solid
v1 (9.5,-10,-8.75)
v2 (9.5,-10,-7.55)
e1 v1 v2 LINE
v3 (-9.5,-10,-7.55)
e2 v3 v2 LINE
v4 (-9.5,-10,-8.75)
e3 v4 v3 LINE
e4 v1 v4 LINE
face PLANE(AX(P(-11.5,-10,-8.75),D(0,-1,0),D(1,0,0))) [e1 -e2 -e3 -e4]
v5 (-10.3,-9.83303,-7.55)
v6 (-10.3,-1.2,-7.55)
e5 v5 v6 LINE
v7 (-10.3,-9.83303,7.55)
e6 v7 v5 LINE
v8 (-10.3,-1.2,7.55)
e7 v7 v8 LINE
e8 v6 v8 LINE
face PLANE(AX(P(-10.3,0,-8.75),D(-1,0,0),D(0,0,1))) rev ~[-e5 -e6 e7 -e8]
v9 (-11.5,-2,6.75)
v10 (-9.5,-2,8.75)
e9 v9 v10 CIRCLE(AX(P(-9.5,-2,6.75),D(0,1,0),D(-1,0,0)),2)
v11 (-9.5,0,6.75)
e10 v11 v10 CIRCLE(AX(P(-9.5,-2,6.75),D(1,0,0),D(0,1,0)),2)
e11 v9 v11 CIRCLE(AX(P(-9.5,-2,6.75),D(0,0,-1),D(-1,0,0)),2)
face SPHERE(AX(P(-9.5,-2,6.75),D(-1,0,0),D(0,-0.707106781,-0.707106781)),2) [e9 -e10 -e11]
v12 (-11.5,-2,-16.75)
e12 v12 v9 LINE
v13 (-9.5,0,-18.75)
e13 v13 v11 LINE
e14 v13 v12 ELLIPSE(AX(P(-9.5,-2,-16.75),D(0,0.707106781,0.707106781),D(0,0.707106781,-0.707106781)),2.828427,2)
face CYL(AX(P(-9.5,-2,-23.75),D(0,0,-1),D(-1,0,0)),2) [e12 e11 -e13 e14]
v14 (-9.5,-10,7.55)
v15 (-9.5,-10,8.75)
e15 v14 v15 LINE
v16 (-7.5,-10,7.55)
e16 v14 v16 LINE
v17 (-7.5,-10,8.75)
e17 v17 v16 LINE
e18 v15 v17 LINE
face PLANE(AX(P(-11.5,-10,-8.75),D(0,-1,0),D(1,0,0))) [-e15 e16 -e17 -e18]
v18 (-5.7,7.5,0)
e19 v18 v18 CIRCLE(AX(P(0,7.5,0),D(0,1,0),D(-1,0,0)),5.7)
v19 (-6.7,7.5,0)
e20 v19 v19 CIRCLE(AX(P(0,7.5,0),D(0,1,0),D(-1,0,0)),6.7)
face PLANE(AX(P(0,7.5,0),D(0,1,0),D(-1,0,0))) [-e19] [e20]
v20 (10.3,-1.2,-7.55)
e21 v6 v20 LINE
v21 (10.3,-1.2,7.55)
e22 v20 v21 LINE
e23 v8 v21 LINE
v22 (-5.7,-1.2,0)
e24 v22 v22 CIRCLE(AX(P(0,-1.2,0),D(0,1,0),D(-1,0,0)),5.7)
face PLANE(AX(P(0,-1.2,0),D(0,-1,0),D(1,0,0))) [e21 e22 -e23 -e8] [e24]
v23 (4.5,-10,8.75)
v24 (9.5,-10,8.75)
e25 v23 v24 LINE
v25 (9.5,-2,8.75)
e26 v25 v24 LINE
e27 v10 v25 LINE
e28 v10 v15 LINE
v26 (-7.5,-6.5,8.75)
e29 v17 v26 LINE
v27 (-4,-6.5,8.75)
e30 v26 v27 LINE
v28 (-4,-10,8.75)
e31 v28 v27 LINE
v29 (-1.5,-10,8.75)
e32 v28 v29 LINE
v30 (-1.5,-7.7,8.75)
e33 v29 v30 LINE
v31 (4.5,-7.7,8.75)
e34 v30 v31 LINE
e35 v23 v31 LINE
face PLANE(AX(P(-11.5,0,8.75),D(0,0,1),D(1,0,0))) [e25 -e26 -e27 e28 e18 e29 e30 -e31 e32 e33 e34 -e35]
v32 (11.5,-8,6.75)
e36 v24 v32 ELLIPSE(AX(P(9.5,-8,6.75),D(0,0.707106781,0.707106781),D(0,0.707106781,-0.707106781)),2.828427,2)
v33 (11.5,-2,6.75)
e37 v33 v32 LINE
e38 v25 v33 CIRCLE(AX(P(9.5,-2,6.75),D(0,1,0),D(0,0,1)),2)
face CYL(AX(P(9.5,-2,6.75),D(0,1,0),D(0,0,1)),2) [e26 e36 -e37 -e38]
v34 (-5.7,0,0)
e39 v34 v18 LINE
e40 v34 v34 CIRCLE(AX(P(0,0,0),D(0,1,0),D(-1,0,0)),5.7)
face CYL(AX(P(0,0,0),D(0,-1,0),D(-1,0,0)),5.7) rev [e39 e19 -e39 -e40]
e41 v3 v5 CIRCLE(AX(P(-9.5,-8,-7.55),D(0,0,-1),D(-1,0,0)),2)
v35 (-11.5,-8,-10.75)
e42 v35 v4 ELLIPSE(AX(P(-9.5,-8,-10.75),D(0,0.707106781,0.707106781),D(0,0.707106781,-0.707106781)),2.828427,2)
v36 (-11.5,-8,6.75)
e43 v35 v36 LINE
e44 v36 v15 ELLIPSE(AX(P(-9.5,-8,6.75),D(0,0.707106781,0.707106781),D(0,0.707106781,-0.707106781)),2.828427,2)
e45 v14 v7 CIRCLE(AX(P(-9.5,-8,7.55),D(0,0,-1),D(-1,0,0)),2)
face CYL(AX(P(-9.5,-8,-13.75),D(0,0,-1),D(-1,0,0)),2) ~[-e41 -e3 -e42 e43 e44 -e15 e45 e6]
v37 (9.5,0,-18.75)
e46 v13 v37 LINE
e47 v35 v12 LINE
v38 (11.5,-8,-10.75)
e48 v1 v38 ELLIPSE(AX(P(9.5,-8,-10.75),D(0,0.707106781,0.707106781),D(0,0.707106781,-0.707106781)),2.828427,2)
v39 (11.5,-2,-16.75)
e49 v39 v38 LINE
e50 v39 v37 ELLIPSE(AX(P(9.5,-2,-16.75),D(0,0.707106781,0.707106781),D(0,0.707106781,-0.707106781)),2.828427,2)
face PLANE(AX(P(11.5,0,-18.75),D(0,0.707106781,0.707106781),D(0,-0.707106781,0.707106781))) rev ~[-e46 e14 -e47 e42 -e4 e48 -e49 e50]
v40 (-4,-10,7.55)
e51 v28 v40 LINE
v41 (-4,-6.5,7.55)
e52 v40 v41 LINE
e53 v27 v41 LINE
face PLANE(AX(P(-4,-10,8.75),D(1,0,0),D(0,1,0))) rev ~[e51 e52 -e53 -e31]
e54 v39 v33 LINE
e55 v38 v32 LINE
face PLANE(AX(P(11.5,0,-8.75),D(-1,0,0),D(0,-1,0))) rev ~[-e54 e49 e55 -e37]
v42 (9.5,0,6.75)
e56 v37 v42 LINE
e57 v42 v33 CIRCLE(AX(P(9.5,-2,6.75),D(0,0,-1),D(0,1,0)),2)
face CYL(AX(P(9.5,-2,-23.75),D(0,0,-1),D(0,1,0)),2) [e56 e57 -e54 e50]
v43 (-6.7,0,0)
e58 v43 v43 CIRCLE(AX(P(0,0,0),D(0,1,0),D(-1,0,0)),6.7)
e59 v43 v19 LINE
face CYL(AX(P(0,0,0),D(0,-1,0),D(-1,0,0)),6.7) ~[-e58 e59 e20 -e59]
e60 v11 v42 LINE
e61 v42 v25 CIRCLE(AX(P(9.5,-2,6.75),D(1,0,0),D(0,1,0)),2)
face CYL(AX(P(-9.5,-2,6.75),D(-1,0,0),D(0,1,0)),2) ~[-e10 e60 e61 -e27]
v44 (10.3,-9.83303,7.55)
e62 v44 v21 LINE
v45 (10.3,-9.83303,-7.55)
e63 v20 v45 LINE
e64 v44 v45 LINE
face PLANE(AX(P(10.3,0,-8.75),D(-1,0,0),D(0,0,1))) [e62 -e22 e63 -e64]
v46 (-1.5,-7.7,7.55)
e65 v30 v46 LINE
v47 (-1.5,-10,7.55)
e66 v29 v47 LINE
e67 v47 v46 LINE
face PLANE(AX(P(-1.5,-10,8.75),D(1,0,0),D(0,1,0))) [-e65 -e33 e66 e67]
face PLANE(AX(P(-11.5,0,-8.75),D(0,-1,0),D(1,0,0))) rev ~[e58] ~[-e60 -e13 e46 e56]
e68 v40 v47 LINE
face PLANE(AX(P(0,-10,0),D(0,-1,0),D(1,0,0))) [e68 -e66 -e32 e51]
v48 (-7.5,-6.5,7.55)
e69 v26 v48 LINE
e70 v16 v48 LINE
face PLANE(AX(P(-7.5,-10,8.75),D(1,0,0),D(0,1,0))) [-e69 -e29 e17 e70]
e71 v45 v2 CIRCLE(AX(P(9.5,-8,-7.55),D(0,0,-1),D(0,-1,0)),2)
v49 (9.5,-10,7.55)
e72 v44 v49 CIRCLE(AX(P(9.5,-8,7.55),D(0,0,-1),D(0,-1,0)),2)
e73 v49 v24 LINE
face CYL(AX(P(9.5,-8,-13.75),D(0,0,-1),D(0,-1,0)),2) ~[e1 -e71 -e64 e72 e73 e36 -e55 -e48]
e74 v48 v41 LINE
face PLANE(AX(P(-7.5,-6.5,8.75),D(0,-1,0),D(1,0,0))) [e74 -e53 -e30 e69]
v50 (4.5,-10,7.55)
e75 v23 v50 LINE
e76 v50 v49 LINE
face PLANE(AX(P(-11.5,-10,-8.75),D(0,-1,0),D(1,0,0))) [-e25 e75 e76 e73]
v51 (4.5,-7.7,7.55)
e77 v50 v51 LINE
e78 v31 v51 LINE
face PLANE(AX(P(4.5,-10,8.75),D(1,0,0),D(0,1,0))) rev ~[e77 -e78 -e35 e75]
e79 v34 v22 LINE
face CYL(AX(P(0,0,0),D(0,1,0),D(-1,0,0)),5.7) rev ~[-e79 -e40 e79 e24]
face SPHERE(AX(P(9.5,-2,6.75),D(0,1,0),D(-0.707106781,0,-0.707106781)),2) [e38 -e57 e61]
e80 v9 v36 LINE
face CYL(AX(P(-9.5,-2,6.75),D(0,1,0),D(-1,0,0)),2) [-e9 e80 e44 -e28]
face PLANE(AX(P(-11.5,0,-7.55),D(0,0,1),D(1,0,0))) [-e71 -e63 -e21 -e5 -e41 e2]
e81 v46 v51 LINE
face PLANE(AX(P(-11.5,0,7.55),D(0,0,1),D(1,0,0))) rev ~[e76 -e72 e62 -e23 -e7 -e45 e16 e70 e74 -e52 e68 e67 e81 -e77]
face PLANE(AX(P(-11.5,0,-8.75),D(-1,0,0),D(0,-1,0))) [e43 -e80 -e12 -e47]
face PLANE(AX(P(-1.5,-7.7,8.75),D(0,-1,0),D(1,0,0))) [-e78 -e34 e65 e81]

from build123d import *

# Parameters (mm, degrees)
F0_W          = 23
F0_H          = 17.5
F1_DEPTH      = 10
F2_T          = -1.2
F3_R          = 5.7
F4_DEPTH      = 3
F3_R_2        = 6.7
F5_DEPTH      = 7.5
F6_W          = 6
F6_H          = 2.3
F6_W_2        = 3.5
F6_H_2        = 3.5
F7_DEPTH      = 4
F8_DEPTH      = 10
F10_DEPTH     = 30
F11_T1_DEPTH  = 19
F11_T3_DEPTH  = 30.5
F11_T5_DEPTH  = 13
F11_T7_DEPTH  = 27.5
F11_S11_W     = 2
F11_S11_H     = 2
F11_T12_DEPTH = 2
F11_S17_W     = 2
F11_S17_H     = 2
F11_T18_DEPTH = 2


# Not quite as in the source:
# - a fillet or chamfer that OpenCascade refuses, or shapes differently, is made with other operations: its cross-section is extruded or revolved along the edge and cut away or added


with BuildPart() as f1:
    # F0 (on Front) → F1 (new body)
    with BuildSketch(Plane.XZ):
        Rectangle(F0_W, F0_H)
    extrude(amount=F1_DEPTH)

    # F2
    f2_openings = [f1.faces().sort_by_distance(p)[0] for p in [
        (0, -10, 0),
    ]]
    offset(amount=F2_T, openings=f2_openings)

    # F3 (on face) → F4 (cut)
    with BuildSketch(Plane(origin=(0, 0, 0), x_dir=(-1, 0, 0), z_dir=(0, 1, 0))):
        Circle(F3_R)
    extrude(amount=-F4_DEPTH, mode=Mode.SUBTRACT)

    # F3 (on face) → F5 (join)
    with BuildSketch(Plane(origin=(0, 0, 0), x_dir=(-1, 0, 0), z_dir=(0, 1, 0))):
        Circle(F3_R_2)
        Circle(F3_R, mode=Mode.SUBTRACT)
    extrude(amount=F5_DEPTH)

    # F6 (on face) → F7 (cut)
    with BuildSketch(Plane.XY.offset(8.75)):
        with Locations((1.5, -8.85)):
            Rectangle(F6_W, F6_H)
        with Locations((-5.75, -8.25)):
            Rectangle(F6_W_2, F6_H_2)
    extrude(amount=-F7_DEPTH, mode=Mode.SUBTRACT)

    # F8 (add): a face of the model
    f8_faces = [f1.faces().sort_by_distance(p)[0] for p in [
        (0, -5, -8.75),
    ]]
    extrude(f8_faces, amount=F8_DEPTH)

    # F9 (on face) → F10 (cut)
    with BuildSketch(Plane.YZ.offset(11.5)):
        Polygon((-10, -18.75), (0, -18.75), (-10, -8.75), align=None)
    extrude(amount=-F10_DEPTH, mode=Mode.SUBTRACT)

    # F11: fillet of radius 2 on 7 edges, made by hand

    # F11_s2 → F11_t1 (cut)
    with BuildSketch(Plane.YZ.offset(-9.5)):
        with BuildLine():
            ThreePointArc((0, 6.75), (-0.5857864376, 8.1642135624), (-2, 8.75))
            Line((-2, 8.75), (0, 8.75))
            Line((0, 8.75), (0, 6.75))
        make_face()
    extrude(amount=F11_T1_DEPTH, mode=Mode.SUBTRACT)

    # F11_s4 → F11_t3 (cut)
    with BuildSketch(Plane.XY.offset(-23.75)):
        with BuildLine():
            ThreePointArc((-11.5, -2), (-10.9142135624, -0.5857864376), (-9.5, 0))
            Line((-9.5, 0), (-11.5, 0))
            Line((-11.5, 0), (-11.5, -2))
        make_face()
        with BuildLine():
            ThreePointArc((9.5, 0), (10.9142135624, -0.5857864376), (11.5, -2))
            Line((11.5, -2), (11.5, 0))
            Line((11.5, 0), (9.5, 0))
        make_face()
    extrude(amount=F11_T3_DEPTH, mode=Mode.SUBTRACT)

    # F11_s6 → F11_t5 (cut)
    with BuildSketch(Plane.XZ.offset(2)):
        with BuildLine():
            ThreePointArc((9.5, 8.75), (10.9142135624, 8.1642135624), (11.5, 6.75))
            Line((11.5, 6.75), (11.5, 8.75))
            Line((11.5, 8.75), (9.5, 8.75))
        make_face()
        with BuildLine():
            ThreePointArc((-11.5, 6.75), (-10.9142135624, 8.1642135624), (-9.5, 8.75))
            Line((-9.5, 8.75), (-11.5, 8.75))
            Line((-11.5, 8.75), (-11.5, 6.75))
        make_face()
    extrude(amount=F11_T5_DEPTH, mode=Mode.SUBTRACT)

    # F11_s8 → F11_t7 (cut)
    with BuildSketch(Plane.XY.offset(-13.75)):
        with BuildLine():
            ThreePointArc((9.5, -10), (10.9142135624, -9.4142135624), (11.5, -8))
            Line((11.5, -8), (11.5, -10))
            Line((11.5, -10), (9.5, -10))
        make_face()
        with BuildLine():
            ThreePointArc((-11.5, -8), (-10.9142135624, -9.4142135624), (-9.5, -10))
            Line((-9.5, -10), (-11.5, -10))
            Line((-11.5, -10), (-11.5, -8))
        make_face()
    extrude(amount=F11_T7_DEPTH, mode=Mode.SUBTRACT)


with BuildPart() as f11_tool10:
    # F11_s11 → F11_t12 (new body)
    with BuildSketch(Plane.XZ.offset(2)):
        with Locations((10.5, 7.75)):
            Rectangle(F11_S11_W, F11_S11_H)
    extrude(amount=-F11_T12_DEPTH)

    # F11_s13 → F11_t14 (revolve, cut)
    with BuildSketch(Plane(origin=(9.5, -2, 6.75), x_dir=(-0.7071067812, 0, -0.7071067812), z_dir=(0.7071067812, 0, -0.7071067812))):
        with BuildLine():
            ThreePointArc((0, -2), (2, 0), (0, 2))
            Line((0, 2), (0, -2))
        make_face()
    revolve(axis=Axis((9.5, -2, 6.75), (0, 1, 0)), mode=Mode.SUBTRACT)


with BuildPart() as f1_1:
    add(f1.part)

    # F11_t9: cut F11_tool10
    add(f11_tool10.part, mode=Mode.SUBTRACT)


with BuildPart() as f11_tool16:
    # F11_s17 → F11_t18 (new body)
    with BuildSketch(Plane.YZ.offset(-9.5)):
        with Locations((-1, 7.75)):
            Rectangle(F11_S17_W, F11_S17_H)
    extrude(amount=-F11_T18_DEPTH)

    # F11_s19 → F11_t20 (revolve, cut)
    with BuildSketch(Plane(origin=(-9.5, -2, 6.75), x_dir=(0, -0.7071067812, -0.7071067812), z_dir=(0, 0.7071067812, -0.7071067812))):
        with BuildLine():
            ThreePointArc((0, -2), (2, 0), (0, 2))
            Line((0, 2), (0, -2))
        make_face()
    revolve(axis=Axis((-9.5, -2, 6.75), (-1, 0, 0)), mode=Mode.SUBTRACT)


with BuildPart() as f1_2:
    add(f1_1.part)

    # F11_t15: cut F11_tool16
    add(f11_tool16.part, mode=Mode.SUBTRACT)


solid = f1_2.part
